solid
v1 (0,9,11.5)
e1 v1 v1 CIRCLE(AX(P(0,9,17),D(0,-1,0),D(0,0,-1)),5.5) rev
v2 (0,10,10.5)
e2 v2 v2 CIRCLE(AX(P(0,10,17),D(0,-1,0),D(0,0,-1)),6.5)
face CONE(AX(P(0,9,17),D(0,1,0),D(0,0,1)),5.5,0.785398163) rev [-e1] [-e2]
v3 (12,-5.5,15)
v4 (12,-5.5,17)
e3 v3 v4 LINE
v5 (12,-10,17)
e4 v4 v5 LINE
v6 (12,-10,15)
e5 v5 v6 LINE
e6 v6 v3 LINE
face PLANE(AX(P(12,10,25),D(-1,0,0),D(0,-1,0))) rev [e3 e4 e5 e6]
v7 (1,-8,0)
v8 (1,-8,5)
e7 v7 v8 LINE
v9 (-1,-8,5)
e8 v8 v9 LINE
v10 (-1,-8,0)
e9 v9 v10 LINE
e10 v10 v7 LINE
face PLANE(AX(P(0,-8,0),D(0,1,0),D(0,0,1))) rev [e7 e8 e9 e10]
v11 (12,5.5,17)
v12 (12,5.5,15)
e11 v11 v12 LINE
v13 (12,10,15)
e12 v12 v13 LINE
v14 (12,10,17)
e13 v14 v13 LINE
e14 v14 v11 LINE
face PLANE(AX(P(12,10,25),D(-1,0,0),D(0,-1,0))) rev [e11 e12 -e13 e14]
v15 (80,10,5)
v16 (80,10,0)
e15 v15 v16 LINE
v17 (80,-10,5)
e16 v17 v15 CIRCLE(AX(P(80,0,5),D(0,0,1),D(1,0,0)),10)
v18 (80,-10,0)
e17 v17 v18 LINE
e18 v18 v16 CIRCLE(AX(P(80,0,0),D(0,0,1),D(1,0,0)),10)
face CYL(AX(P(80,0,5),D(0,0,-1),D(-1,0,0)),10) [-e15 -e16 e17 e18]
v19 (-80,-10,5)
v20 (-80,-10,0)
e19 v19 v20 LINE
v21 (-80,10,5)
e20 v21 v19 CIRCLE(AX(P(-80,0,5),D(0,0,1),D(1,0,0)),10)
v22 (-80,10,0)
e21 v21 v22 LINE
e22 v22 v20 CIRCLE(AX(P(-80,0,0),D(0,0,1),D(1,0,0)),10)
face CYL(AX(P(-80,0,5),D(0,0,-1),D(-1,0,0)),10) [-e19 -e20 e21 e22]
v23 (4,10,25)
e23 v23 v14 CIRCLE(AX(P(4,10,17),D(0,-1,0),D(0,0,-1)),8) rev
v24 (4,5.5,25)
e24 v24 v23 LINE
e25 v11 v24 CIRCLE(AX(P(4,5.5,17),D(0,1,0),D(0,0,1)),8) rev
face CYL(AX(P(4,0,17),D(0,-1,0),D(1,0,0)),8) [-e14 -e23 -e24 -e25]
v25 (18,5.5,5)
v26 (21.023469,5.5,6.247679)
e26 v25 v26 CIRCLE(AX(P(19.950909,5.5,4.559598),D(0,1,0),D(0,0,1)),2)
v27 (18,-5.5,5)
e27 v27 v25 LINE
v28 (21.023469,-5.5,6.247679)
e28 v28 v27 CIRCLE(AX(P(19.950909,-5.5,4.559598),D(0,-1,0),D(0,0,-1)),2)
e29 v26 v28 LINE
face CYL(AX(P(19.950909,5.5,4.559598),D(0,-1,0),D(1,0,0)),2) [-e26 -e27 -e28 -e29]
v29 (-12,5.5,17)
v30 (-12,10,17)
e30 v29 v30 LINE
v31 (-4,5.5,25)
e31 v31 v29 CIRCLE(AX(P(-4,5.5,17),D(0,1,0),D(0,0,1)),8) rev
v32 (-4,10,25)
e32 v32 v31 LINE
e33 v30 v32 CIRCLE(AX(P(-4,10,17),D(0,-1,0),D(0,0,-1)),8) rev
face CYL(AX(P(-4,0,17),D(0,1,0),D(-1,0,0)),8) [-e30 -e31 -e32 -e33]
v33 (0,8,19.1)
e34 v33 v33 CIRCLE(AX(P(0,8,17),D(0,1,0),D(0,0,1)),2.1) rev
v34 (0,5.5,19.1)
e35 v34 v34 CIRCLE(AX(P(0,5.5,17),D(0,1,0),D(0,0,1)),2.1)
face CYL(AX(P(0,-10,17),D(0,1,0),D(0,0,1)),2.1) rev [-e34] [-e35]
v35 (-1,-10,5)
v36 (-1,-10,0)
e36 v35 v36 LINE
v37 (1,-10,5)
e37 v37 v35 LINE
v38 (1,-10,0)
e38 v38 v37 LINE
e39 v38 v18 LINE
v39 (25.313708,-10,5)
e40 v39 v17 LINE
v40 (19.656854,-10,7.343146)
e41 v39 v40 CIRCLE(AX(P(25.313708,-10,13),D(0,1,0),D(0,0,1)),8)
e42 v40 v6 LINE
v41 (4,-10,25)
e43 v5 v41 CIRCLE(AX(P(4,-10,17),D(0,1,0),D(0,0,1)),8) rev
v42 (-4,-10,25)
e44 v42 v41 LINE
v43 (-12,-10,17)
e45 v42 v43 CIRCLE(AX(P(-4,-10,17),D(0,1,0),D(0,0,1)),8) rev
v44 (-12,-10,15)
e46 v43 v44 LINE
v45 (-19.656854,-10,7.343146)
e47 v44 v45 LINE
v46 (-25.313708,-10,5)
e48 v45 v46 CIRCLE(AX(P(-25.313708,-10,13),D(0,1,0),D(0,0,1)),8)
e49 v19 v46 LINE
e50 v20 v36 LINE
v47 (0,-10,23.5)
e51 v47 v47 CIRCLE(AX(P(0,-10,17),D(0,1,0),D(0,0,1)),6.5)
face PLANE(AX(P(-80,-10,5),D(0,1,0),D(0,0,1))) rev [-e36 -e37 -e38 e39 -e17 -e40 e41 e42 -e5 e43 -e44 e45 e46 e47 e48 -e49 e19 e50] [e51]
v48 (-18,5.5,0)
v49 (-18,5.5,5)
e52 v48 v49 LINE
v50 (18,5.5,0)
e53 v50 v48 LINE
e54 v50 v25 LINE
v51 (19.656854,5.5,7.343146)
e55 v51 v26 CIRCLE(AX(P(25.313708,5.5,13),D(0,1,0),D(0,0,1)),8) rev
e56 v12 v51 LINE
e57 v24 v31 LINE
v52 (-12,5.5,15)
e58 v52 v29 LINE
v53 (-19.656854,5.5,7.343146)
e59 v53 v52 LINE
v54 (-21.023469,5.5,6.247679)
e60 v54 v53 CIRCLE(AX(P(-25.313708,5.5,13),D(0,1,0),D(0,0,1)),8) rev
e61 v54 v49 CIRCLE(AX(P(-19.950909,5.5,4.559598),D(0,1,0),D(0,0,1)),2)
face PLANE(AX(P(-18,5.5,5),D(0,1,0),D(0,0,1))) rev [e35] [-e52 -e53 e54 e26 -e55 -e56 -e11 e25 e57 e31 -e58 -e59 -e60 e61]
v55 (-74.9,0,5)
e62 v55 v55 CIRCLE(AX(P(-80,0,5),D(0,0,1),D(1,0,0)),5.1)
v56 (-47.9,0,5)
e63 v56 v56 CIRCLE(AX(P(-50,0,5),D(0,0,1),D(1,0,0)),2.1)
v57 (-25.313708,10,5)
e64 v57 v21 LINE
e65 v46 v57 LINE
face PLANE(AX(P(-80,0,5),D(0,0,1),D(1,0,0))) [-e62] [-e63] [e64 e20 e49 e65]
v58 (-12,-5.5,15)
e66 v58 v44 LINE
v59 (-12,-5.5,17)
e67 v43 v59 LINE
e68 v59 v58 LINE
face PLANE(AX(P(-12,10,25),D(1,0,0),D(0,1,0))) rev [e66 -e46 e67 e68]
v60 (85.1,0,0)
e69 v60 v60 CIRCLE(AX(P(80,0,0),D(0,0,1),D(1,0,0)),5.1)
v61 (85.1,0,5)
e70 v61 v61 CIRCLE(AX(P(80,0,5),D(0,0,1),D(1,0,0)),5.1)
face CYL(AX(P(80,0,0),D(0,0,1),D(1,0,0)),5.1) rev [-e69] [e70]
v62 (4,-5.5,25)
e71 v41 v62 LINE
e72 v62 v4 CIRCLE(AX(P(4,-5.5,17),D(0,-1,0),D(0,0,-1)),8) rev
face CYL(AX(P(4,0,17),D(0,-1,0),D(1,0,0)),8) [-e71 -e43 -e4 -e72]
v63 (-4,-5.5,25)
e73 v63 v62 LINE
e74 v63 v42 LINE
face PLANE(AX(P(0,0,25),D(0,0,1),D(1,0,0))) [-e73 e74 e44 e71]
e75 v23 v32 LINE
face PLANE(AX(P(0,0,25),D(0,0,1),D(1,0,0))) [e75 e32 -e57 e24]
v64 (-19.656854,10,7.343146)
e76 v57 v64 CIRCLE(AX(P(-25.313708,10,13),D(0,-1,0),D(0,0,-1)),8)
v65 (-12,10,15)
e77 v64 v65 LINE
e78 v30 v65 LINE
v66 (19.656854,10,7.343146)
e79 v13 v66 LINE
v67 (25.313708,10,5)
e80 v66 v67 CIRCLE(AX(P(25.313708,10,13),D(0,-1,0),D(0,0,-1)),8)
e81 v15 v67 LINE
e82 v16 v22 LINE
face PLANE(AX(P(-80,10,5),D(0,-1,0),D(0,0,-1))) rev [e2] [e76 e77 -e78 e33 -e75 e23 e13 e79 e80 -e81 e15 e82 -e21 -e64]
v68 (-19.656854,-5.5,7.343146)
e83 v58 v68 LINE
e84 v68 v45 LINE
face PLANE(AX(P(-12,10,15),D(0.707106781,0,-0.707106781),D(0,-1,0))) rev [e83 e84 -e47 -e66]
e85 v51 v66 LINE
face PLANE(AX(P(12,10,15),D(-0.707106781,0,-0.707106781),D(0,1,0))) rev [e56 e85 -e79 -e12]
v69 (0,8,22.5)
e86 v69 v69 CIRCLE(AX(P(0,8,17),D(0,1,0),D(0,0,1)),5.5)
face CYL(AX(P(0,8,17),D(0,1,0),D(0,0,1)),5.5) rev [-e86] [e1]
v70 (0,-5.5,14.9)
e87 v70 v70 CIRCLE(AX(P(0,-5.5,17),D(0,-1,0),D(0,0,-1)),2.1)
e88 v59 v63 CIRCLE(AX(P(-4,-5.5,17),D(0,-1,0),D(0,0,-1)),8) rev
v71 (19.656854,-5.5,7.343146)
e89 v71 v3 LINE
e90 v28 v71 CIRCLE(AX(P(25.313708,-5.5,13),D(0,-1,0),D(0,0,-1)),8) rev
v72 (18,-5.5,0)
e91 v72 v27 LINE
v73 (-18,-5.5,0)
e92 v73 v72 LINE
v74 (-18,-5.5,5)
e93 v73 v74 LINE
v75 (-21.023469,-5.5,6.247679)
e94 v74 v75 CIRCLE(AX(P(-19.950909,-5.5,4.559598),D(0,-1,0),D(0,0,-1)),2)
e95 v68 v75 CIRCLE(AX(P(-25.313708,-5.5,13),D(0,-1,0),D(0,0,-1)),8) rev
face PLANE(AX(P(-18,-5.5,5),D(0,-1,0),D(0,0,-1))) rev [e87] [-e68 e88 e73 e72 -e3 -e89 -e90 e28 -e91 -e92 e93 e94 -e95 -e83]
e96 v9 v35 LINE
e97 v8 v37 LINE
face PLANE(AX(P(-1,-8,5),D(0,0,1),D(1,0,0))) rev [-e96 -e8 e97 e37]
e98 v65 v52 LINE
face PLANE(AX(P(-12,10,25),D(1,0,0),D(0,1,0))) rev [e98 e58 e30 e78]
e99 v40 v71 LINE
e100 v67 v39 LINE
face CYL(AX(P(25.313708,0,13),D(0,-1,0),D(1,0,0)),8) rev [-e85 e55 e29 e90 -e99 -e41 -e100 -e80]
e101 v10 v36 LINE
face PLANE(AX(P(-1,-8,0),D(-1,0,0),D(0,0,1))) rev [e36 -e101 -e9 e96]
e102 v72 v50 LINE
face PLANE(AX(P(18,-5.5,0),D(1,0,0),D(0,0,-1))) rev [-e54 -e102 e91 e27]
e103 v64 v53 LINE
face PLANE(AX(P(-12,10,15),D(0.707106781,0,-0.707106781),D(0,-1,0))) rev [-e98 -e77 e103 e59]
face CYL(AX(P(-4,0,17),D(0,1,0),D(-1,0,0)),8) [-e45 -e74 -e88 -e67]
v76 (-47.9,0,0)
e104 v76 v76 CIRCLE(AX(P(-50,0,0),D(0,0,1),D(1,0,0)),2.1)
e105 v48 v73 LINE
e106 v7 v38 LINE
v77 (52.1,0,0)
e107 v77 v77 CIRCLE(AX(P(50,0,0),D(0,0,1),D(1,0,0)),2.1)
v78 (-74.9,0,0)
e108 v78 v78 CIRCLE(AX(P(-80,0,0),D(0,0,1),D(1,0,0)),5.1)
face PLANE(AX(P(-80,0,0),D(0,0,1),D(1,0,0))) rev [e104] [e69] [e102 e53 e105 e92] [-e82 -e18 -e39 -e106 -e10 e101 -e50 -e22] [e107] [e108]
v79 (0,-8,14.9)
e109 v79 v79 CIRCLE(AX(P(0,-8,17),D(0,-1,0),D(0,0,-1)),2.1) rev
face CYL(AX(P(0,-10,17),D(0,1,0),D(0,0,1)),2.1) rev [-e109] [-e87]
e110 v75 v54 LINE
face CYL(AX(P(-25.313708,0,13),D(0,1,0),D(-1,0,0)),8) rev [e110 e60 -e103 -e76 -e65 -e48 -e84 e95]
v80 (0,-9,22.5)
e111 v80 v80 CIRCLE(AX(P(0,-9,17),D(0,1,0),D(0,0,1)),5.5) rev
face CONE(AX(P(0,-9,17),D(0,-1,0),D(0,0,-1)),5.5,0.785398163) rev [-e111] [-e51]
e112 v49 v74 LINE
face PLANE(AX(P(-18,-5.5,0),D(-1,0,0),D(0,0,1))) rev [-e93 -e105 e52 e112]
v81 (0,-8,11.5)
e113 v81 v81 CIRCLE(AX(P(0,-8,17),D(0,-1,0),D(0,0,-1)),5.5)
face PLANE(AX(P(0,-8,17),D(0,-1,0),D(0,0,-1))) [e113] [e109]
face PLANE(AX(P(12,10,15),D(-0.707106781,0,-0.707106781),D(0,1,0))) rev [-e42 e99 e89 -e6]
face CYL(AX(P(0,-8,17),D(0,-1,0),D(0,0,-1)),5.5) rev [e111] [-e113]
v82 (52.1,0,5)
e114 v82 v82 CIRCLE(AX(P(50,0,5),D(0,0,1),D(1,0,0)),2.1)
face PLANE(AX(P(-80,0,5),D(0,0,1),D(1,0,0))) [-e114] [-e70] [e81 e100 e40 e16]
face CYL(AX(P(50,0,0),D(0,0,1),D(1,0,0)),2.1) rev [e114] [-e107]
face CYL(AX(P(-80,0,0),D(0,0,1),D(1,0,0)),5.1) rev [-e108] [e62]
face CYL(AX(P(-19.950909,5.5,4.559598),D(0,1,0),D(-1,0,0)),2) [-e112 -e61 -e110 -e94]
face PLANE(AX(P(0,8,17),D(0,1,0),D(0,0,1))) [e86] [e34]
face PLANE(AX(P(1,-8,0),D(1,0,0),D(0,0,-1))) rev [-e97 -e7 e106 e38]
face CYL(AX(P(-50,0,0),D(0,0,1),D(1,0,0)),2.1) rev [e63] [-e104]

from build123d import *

# Parameters (mm, degrees)
BOSS_EXTRU_1_DEPTH      = 5
ESQUISSE2_R             = 5.1
ESQUISSE2_R_2           = 2.1
ENL_V_MAT_EXTRU_1_DEPTH = 91.691785736
ESQUISSE3_W             = 24
ESQUISSE3_H             = 20
BOSS_EXTRU_2_DEPTH      = 20
CHANFREIN1_SIZE         = 10
ESQUISSE4_W             = 36
ESQUISSE4_H             = 11
ENL_V_MAT_EXTRU_2_DEPTH = 20
ESQUISSE5_R             = 2.1
ENL_V_MAT_EXTRU_3_DEPTH = 96.524865873
CONG_1_R                = 8
ESQUISSE6_R             = 5.5
ENL_V_MAT_EXTRU_4_DEPTH = 2
CHANFREIN2_SIZE         = 1
CONG_4_R                = 2
ENL_V_START             = -2
ESQUISSE7_R             = 5.5
ENL_V_MAT_EXTRU_5_DEPTH = 2
CHANFREIN3_SIZE         = 1
ESQUISSE8_W             = 36
ESQUISSE8_H             = 11
ENL_V_MAT_EXTRU_6_DEPTH = 93.736184955
ESQUISSE9_W             = 2
ESQUISSE9_H             = 5
ENL_V_MAT_EXTRU_7_DEPTH = 2


with BuildPart() as part:
    # Esquisse1 → Boss.-Extru.1 (new body)
    with BuildSketch(Plane.XY):
        with BuildLine():
            Line((-80, 10), (80, 10))
            ThreePointArc((80, 10), (90, 0), (80, -10))
            Line((80, -10), (-80, -10))
            ThreePointArc((-80, -10), (-90, 0), (-80, 10))
        make_face()
    extrude(amount=BOSS_EXTRU_1_DEPTH)

    # Esquisse2 → Enlèv. mat.-Extru.1 (cut, through all)
    with BuildSketch(Plane.XY.offset(5)):
        with Locations((-80, 0)):
            Circle(ESQUISSE2_R)
        with Locations((80, 0)):
            Circle(ESQUISSE2_R)
        with Locations((-50, 0)):
            Circle(ESQUISSE2_R_2)
        with Locations((50, 0)):
            Circle(ESQUISSE2_R_2)
    extrude(amount=-ENL_V_MAT_EXTRU_1_DEPTH, mode=Mode.SUBTRACT)

    # Esquisse3 → Boss.-Extru.2 (add)
    with BuildSketch(Plane.XY.offset(5)):
        Rectangle(ESQUISSE3_W, ESQUISSE3_H)
    extrude(amount=BOSS_EXTRU_2_DEPTH)

    # Chanfrein1
    chanfrein1_edges = [part.edges().sort_by_distance(p)[0] for p in [
        (12, 0, 5),
        (-12, 0, 5),
    ]]
    chamfer(chanfrein1_edges, length=CHANFREIN1_SIZE)

    # Esquisse4 → Enlèv. mat.-Extru.2 (cut)
    with BuildSketch(Plane.XY.offset(25)):
        Rectangle(ESQUISSE4_W, ESQUISSE4_H)
    extrude(amount=-ENL_V_MAT_EXTRU_2_DEPTH, mode=Mode.SUBTRACT)

    # Esquisse5 → Enlèv. mat.-Extru.3 (cut, through all)
    with BuildSketch(Plane(origin=(0, 10, 0), x_dir=(1, 0, 0), z_dir=(0, 1, 0))):
        with Locations(Location((0, -17, 0), (0, 0, 270))):
            Circle(ESQUISSE5_R)
    extrude(amount=-ENL_V_MAT_EXTRU_3_DEPTH, mode=Mode.SUBTRACT)

    # Congé1
    cong_1_edges = [part.edges().sort_by_distance(p)[0] for p in [
        (-22, 0, 5),
        (-12, -7.75, 25),
        (12, -7.75, 25),
        (22, 0, 5),
        (-12, 7.75, 25),
        (12, 7.75, 25),
    ]]
    fillet(cong_1_edges, radius=CONG_1_R)

    # Esquisse6 → Enlèv. mat.-Extru.4 (cut)
    with BuildSketch(Plane(origin=(0, 10, 0), x_dir=(1, 0, 0), z_dir=(0, 1, 0))):
        with Locations(Location((0, -17, 0), (0, 0, 270))):
            Circle(ESQUISSE6_R)
    extrude(amount=-ENL_V_MAT_EXTRU_4_DEPTH, mode=Mode.SUBTRACT)

    # Chanfrein2
    chanfrein2_edges = [part.edges().sort_by_distance(p)[0] for p in [
        (0, 10, 11.5),
    ]]
    chamfer(chanfrein2_edges, length=CHANFREIN2_SIZE)

    # Congé4
    # the kernel refuses this fillet: 2 mm, written as the material it takes off along each edge
    with BuildSketch(Plane(origin=(18, -5.5, 9), x_dir=(0.7394878589424565, 0, -0.6731698942144558), z_dir=(0, 1, 0)), Plane(origin=(-18, 5.5, 9), x_dir=(-0.7394878589424565, 0, -0.6731698942144557), z_dir=(0, -1, 0))) as cong_4_piece_1:
        with BuildLine():
            CenterArc((4.431818389, 1.970329953), CONG_4_R, 150.40864019, 109.709922664)
            Line((2.692679577, 2.957951436), (2.518765696, 3.056713584))
            ThreePointArc((2.518765696, 3.056713584), (1.198442217, 1.613609697), (-0.147897572, 0.134633979))
            Line((-0.147897572, 0.134633979), (0.009378777, -0.199779975))
            ThreePointArc((0.009378777, -0.199779975), (2.349946778, -0.089900774), (4.054276537, -0.197032995))
            Line((4.054276537, -0.197032995), (4.088598523, 0))
        make_face()
    extrude(amount=11, mode=Mode.SUBTRACT)

    # Esquisse7 → Enlèv. mat.-Extru.5 (cut)
    with BuildSketch(Plane.XZ.offset(10).offset(ENL_V_START)):
        with Locations(Location((0, 17, 0), (0, 0, 90))):
            Circle(ESQUISSE7_R)
    extrude(amount=ENL_V_MAT_EXTRU_5_DEPTH, mode=Mode.SUBTRACT)

    # Chanfrein3
    chanfrein3_edges = [part.edges().sort_by_distance(p)[0] for p in [
        (0, -10, 11.5),
    ]]
    chamfer(chanfrein3_edges, length=CHANFREIN3_SIZE)

    # Esquisse8 → Enlèv. mat.-Extru.6 (cut, through all)
    with BuildSketch(Plane.XY.offset(5)):
        Rectangle(ESQUISSE8_W, ESQUISSE8_H)
    extrude(amount=-ENL_V_MAT_EXTRU_6_DEPTH, mode=Mode.SUBTRACT)

    # Esquisse9 → Enlèv. mat.-Extru.7 (cut)
    with BuildSketch(Plane.XZ.offset(10)):
        with Locations((0, 2.5)):
            Rectangle(ESQUISSE9_W, ESQUISSE9_H)
    extrude(amount=-ENL_V_MAT_EXTRU_7_DEPTH, mode=Mode.SUBTRACT)


solid = part.part
